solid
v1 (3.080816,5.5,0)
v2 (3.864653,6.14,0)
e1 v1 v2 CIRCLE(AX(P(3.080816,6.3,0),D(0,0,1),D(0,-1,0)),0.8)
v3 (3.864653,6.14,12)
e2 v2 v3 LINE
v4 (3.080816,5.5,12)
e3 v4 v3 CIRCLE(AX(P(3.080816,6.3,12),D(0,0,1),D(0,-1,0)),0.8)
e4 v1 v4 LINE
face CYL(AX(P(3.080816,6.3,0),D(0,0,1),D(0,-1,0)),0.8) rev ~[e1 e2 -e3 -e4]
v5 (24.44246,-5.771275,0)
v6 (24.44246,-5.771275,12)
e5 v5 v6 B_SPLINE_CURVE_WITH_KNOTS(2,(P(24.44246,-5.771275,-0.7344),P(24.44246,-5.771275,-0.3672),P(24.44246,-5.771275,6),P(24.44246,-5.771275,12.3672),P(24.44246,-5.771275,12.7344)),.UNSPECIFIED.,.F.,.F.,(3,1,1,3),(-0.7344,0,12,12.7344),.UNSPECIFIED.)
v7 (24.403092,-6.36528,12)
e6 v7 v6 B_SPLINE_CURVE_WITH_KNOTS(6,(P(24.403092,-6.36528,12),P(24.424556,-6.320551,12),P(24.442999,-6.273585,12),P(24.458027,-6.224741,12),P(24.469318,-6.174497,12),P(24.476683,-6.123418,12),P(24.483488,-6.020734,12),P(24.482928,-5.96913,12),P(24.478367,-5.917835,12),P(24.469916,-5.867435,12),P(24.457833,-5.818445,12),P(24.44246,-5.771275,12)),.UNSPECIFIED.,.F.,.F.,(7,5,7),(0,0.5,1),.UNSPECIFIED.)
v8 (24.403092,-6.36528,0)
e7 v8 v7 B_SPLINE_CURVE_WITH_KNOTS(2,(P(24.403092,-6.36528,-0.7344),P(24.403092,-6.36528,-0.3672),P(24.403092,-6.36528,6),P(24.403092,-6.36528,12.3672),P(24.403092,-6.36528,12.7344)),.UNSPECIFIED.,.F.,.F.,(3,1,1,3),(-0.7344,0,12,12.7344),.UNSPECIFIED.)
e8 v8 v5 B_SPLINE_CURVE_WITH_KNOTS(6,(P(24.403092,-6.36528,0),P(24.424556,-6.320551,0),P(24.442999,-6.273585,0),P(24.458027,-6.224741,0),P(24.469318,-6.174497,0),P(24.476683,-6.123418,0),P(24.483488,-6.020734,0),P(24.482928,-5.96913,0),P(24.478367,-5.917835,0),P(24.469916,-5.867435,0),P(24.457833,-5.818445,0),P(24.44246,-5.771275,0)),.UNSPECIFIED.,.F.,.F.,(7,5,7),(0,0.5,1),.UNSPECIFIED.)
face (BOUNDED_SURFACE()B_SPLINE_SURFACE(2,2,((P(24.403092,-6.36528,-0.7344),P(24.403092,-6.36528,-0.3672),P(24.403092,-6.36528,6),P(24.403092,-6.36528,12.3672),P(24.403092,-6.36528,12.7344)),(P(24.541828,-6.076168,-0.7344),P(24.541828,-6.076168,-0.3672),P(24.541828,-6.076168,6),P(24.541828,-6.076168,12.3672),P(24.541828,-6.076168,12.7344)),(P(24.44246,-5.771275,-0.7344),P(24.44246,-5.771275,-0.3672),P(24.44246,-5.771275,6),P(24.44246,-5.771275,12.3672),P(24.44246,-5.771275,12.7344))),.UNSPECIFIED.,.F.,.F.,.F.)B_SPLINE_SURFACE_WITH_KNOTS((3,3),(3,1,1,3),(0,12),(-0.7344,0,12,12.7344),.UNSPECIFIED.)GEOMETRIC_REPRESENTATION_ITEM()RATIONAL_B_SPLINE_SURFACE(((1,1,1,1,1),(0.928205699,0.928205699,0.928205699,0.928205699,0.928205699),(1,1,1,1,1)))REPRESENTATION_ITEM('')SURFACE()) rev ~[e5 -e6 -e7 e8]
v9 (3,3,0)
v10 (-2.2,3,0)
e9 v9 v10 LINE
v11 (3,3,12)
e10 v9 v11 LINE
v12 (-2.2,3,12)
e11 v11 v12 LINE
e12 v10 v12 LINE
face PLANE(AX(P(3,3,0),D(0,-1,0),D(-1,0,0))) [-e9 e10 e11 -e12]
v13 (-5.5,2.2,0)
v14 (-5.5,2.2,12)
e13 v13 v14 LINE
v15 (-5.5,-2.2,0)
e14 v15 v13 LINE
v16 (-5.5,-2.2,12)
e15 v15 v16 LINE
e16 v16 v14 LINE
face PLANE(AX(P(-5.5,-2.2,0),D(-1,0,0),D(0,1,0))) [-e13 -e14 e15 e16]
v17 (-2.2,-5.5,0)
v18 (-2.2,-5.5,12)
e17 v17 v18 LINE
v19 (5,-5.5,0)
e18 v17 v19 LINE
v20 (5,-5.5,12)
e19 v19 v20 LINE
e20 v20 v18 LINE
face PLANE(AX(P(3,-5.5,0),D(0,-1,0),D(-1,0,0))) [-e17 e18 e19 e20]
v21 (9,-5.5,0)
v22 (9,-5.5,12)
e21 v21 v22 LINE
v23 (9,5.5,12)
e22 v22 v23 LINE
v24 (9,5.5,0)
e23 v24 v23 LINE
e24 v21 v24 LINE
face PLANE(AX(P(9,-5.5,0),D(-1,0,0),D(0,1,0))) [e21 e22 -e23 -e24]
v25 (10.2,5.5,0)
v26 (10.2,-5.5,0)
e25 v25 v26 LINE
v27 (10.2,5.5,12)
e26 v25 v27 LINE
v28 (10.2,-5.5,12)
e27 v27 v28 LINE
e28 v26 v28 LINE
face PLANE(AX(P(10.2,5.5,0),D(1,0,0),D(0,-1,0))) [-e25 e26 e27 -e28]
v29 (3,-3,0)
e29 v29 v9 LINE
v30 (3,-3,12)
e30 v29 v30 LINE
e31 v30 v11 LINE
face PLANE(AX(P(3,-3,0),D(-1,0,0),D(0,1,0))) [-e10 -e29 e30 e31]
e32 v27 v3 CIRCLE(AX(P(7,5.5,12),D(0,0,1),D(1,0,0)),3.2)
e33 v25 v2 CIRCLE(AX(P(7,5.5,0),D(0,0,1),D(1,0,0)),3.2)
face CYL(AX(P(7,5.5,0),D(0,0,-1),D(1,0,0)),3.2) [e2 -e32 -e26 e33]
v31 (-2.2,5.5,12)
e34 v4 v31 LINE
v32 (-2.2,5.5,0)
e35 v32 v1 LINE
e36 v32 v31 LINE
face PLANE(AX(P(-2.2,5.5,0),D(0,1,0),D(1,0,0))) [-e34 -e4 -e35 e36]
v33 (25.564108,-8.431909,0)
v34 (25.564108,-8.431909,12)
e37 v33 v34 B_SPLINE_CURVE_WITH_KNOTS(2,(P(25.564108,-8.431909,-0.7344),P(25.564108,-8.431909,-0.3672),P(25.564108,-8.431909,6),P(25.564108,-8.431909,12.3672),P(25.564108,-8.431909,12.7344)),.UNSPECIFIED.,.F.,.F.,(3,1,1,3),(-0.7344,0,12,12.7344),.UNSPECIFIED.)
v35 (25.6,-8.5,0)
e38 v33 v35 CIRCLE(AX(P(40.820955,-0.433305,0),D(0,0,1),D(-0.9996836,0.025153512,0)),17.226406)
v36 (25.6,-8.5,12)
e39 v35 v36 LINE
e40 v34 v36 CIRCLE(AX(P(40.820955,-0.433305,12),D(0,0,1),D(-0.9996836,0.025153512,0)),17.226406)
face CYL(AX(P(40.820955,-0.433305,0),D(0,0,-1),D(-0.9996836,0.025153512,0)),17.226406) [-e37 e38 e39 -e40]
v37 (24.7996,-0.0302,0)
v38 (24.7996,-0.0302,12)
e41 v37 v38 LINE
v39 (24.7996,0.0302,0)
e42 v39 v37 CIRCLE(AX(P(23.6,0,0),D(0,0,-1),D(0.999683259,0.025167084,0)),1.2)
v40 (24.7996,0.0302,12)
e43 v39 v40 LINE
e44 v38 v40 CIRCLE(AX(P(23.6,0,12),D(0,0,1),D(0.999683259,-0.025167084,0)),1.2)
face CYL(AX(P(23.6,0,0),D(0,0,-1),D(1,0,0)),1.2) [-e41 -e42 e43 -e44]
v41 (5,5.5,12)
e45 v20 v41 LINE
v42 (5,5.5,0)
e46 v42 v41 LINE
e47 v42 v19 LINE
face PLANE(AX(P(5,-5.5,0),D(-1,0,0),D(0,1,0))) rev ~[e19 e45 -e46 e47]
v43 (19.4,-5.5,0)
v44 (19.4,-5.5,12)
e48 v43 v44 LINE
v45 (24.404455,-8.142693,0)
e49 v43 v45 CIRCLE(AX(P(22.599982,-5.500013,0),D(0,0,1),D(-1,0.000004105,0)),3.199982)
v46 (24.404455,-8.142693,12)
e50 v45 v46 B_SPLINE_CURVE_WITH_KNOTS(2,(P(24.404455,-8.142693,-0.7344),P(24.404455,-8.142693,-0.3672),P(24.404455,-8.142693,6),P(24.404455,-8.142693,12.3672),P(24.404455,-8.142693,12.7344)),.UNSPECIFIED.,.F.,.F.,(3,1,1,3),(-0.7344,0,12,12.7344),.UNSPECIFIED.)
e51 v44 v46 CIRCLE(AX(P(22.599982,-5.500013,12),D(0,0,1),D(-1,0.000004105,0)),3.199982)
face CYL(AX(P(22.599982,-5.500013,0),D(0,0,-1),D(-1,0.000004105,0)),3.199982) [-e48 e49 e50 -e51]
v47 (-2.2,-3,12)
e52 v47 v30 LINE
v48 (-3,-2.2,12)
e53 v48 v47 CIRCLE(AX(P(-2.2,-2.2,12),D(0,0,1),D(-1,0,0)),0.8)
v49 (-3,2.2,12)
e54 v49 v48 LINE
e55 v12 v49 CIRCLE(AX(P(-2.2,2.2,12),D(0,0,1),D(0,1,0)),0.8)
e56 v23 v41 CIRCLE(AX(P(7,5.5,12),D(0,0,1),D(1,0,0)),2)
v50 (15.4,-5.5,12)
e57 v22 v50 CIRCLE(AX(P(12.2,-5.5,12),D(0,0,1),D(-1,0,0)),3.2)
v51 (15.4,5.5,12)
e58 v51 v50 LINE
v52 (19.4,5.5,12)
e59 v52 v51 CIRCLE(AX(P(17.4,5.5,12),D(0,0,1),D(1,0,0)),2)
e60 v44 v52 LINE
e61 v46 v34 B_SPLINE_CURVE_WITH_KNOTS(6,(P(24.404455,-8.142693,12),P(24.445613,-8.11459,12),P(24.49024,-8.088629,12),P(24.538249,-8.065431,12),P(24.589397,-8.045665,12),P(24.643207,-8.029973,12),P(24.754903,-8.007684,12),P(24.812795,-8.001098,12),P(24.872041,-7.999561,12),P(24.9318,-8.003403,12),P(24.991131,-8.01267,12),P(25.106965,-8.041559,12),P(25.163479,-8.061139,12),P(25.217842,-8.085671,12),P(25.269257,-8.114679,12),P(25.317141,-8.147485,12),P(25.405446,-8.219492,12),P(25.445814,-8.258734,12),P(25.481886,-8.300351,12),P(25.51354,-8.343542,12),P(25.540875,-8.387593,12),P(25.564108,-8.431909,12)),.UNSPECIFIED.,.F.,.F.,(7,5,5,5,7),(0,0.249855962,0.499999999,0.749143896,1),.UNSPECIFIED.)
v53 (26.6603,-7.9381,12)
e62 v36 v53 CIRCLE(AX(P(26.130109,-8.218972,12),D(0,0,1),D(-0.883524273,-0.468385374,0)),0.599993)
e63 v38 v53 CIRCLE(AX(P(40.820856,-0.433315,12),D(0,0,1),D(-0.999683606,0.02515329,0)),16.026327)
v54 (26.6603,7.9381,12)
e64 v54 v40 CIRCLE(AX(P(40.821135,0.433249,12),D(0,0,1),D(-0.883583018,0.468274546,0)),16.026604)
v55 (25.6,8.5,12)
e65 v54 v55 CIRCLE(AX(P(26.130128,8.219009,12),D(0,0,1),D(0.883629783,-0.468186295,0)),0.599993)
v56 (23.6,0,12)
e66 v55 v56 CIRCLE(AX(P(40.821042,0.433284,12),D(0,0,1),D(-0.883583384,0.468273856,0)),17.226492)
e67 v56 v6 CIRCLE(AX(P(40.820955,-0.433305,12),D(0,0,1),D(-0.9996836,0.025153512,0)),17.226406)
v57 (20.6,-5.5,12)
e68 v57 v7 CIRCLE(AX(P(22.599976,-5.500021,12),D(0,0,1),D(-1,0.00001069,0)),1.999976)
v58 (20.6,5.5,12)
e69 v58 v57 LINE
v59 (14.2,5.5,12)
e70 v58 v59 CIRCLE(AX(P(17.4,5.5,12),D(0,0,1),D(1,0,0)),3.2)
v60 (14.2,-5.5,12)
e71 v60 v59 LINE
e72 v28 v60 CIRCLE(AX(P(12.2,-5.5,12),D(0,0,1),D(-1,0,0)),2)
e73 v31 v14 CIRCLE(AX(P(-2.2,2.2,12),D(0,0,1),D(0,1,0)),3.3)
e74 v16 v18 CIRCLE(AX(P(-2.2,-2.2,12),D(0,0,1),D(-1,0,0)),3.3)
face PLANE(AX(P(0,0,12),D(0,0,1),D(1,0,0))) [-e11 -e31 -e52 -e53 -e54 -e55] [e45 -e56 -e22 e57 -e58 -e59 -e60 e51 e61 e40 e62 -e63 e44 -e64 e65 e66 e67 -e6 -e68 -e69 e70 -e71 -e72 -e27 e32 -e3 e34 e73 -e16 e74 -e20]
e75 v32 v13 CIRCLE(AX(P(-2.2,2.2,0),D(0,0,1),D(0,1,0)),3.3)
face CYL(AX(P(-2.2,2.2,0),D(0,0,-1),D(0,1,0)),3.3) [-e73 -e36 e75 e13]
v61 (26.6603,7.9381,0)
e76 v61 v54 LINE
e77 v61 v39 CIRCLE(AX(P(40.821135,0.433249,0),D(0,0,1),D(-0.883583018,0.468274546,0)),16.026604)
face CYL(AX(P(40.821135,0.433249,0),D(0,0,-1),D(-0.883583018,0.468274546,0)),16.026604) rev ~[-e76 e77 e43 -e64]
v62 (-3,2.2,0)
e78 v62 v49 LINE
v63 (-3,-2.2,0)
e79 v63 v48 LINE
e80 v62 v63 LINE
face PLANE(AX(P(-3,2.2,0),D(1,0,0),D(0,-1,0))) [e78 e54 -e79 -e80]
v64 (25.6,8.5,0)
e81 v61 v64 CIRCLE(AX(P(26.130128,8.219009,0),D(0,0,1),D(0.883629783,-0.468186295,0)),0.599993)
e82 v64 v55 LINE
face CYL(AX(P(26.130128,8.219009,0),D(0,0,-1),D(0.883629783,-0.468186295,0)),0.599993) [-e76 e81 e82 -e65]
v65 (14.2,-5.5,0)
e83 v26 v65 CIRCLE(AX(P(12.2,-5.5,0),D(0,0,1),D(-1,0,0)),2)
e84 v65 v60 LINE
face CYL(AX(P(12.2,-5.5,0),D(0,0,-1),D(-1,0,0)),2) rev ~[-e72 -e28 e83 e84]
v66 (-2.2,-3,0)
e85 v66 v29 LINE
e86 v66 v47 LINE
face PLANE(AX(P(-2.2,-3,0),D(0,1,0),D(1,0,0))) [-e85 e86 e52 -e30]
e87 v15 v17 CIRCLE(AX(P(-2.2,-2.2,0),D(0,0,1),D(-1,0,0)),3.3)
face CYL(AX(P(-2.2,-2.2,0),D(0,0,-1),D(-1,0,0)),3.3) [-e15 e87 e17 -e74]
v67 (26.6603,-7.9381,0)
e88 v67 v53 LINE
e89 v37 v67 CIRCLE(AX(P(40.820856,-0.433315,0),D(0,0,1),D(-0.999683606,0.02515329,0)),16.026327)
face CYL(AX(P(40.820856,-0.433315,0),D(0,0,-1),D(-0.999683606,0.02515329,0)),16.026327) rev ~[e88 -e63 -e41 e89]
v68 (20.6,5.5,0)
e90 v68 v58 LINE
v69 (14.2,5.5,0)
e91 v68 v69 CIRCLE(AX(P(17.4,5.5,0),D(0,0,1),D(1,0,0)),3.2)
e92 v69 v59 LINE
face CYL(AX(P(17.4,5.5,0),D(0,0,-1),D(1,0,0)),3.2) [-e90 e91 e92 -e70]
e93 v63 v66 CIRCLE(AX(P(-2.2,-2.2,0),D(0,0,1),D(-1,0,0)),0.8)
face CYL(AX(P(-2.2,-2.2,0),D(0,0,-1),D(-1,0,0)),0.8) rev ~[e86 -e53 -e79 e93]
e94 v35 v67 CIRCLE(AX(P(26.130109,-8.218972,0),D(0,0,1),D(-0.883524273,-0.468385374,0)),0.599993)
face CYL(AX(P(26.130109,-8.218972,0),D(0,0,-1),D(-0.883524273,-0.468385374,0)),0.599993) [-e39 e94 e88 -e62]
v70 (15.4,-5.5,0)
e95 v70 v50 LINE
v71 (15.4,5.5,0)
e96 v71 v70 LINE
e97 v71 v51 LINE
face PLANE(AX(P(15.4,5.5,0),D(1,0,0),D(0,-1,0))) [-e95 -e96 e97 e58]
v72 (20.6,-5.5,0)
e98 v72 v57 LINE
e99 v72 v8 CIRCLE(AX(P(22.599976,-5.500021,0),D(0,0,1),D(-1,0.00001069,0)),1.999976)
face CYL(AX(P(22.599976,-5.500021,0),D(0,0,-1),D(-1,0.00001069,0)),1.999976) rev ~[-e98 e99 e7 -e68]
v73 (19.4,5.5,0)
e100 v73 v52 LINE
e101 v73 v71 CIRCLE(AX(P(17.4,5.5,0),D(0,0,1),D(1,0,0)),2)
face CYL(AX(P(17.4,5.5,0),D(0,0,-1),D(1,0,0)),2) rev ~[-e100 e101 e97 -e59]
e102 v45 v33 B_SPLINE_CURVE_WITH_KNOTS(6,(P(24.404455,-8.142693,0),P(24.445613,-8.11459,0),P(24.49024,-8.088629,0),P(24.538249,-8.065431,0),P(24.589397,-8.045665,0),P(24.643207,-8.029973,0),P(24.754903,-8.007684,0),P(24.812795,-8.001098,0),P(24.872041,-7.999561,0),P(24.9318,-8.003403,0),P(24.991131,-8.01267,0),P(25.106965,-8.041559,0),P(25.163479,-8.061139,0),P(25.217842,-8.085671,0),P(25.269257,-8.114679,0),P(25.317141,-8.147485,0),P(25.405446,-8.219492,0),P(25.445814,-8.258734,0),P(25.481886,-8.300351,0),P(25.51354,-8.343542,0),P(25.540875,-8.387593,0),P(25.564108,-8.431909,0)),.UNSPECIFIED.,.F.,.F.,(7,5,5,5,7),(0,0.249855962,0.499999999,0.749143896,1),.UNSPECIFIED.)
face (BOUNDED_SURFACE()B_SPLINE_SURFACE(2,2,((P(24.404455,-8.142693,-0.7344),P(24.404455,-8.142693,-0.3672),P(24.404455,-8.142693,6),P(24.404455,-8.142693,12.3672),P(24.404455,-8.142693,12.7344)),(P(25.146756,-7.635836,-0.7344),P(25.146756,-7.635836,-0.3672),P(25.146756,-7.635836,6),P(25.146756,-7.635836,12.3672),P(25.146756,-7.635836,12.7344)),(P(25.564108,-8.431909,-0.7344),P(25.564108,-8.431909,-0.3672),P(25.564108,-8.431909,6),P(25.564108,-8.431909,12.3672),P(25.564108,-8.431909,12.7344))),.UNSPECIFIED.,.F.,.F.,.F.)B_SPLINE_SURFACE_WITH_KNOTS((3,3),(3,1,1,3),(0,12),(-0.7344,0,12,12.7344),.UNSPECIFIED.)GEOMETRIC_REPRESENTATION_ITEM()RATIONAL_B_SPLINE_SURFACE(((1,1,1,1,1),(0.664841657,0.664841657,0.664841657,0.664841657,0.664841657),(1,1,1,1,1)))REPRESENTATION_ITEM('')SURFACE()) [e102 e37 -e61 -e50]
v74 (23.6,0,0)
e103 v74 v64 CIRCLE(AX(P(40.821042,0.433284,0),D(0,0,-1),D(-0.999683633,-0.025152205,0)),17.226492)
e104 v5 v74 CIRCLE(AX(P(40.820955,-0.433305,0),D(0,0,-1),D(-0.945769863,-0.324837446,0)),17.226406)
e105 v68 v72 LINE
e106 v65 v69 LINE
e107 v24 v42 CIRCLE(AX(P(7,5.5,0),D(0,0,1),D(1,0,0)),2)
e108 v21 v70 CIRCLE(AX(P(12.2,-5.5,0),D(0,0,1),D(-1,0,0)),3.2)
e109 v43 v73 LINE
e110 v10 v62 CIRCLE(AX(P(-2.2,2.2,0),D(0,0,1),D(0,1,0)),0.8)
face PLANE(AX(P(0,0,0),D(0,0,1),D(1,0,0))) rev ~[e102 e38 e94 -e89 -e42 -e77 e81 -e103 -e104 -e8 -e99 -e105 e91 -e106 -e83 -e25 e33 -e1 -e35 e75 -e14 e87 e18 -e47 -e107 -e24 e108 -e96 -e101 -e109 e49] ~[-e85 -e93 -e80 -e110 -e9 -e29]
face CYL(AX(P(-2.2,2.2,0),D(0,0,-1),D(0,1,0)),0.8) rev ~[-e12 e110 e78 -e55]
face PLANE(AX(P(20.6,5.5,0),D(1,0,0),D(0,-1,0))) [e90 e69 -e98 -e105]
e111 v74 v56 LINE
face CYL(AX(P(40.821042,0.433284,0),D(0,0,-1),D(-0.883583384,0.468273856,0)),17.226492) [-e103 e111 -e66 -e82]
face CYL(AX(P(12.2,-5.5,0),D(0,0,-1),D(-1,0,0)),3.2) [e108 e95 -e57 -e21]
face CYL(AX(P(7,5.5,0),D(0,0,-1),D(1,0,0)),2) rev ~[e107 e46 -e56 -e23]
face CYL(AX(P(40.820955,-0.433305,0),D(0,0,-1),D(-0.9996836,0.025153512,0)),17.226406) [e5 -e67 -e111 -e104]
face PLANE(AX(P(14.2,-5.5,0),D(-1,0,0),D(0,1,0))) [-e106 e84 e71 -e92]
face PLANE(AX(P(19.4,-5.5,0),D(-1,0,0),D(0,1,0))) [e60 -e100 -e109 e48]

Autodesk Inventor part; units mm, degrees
ref_plane "YZ Plane" through (0, 0, 0) normal (1, 0, 0) x (0, 1, 0)
ref_plane "XZ Plane" through (0, 0, 0) normal (0, 1, 0) x (-1, 0, 0)
ref_plane "XY Plane" through (0, 0, 0) normal (0, 0, 1) x (1, 0, 0)
sketch "Boceto1" plane through (0, 0, 0) normal (0, 0, 1) x (1, 0, 0)
  line L0 (3, -11.4) -> (3, -5.5)
  line L1 (3, -5.5) -> (-2.2, -5.5)
  arc A0 (-5.5, -2.2) -> (-2.2, -5.5) centre (-2.2, -2.2) ccw
  line L2 (-5.5, -2.2) -> (-5.5, 2.2)
  arc A1 (-2.2, 5.5) -> (-5.5, 2.2) centre (-2.2, 2.2) ccw
  line L3 (-2.2, 5.5) -> (3, 5.5)
  line L4 (3, 5.5) -> (3, 11.4)
  line L5 (3, 3) -> (-2.2, 3)
  arc A2 (-2.2, 3) -> (-3, 2.2) centre (-2.2, 2.2) ccw
  line L6 (-3, 2.2) -> (-3, -2.2)
  arc A3 (-3, -2.2) -> (-2.2, -3) centre (-2.2, -2.2) ccw
  line L7 (-2.2, -3) -> (3, -3)
  line L8 (3, -3) -> (3, 3)
  line L9 (-2.2, 3.25) -> (3.25, 3.25)
  line L10 (3.25, 3.25) -> (3.25, -3.25)
  line L11 (3.25, -3.25) -> (-2.2, -3.25)
  arc A4 (-3.25, -2.2) -> (-2.2, -3.25) centre (-2.2, -2.2) ccw
  line L12 (-3.25, -2.2) -> (-3.25, 2.2)
  arc A5 (-2.2, 3.25) -> (-3.25, 2.2) centre (-2.2, 2.2) ccw
  line L13 (-2.2, 5) -> (5, 5)
  line L14 (5, 5) -> (5, -5)
  line L15 (5, -5) -> (-2.2, -5)
  arc A6 (-5, -2.2) -> (-2.2, -5) centre (-2.2, -2.2) ccw
  line L16 (-5, -2.2) -> (-5, 2.2)
  arc A7 (-2.2, 5) -> (-5, 2.2) centre (-2.2, 2.2) ccw
  line L17 (23.6, 0) -> (22.4, 0)
  arc A8 (25.6, 8.5) -> (23.6, 0) centre (40.821, 0.4333) ccw
  circle A9 centre (23.6, 0) radius 1.2
  arc A10 (26.6603, 7.9381) -> (24.7996, 0.0302) centre (40.821, 0.4333) ccw
  line L18 (25.6, 8.5) -> (25.9736, 8.302)
  arc A11 (26.6603, 7.9381) -> (25.6, 8.5) centre (26.1301, 8.219) ccw
  arc A12 (23.6, 0) -> (25.6, -8.5) centre (40.821, -0.4333) ccw
  arc A13 (24.7996, -0.0302) -> (26.6603, -7.9381) centre (40.821, -0.4333) ccw
  line L19 (25.9736, -8.302) -> (26.6603, -7.9381)
  arc A14 (25.6, -8.5) -> (26.6603, -7.9381) centre (26.1301, -8.219) ccw
  line L20 (3, -5.5) -> (5, -5.5)
  line L21 (5, -5.5) -> (5, -5)
  line L22 (3, 5.5) -> (5, 5.5)
  line L23 (5, 5) -> (5, 5.5)
  line L24 (5, 5.5) -> (7, 5.5)
  line L25 (9, 5.5) -> (10.2, 5.5)
  line L26 (10.2, 5.5) -> (10.2, -5.5)
  line L27 (10.2, -5.5) -> (9, -5.5)
  line L28 (9, -5.5) -> (9, 5.5)
  line L29 (10.2, -5.5) -> (12.2, -5.5)
  arc A15 (10.2, 5.5) -> (3.8, 5.5) centre (7, 5.5) ccw
  arc A16 (9, 5.5) -> (5, 5.5) centre (7, 5.5) ccw
  line L30 (15.4, -5.5) -> (14.2, -5.5)
  line L31 (14.2, -5.5) -> (14.2, 5.5)
  line L32 (14.2, 5.5) -> (15.4, 5.5)
  line L33 (15.4, 5.5) -> (15.4, -5.5)
  arc A17 (10.2, -5.5) -> (14.2, -5.5) centre (12.2, -5.5) ccw
  arc A18 (9, -5.5) -> (15.4, -5.5) centre (12.2, -5.5) ccw
  line L34 (19.4, 5.5) -> (20.6, 5.5)
  line L35 (20.6, 5.5) -> (20.6, -5.5)
  line L36 (20.6, -5.5) -> (19.4, -5.5)
  line L37 (19.4, -5.5) -> (19.4, 5.5)
  line L38 (20.6, -5.5) -> (22.6, -5.5)
  arc A19 (20.6, 5.5) -> (14.2, 5.5) centre (17.4, 5.5) ccw
  arc A20 (19.4, 5.5) -> (15.4, 5.5) centre (17.4, 5.5) ccw
  arc A21 (20.6, -5.5) -> (24.5287, -6.0291) centre (22.6, -5.5) ccw
  arc A22 (19.4, -5.5) -> (25.1061, -7.4898) centre (22.6, -5.5) ccw
  point P0 (0, 0)
  point P1 (4.2, -5)
  point P2 (3.8, 5)
  point P3 (23, 0)
  point P4 (23.6116, -1.1999)
  point P5 (24.7996, 0.0302)
  point P6 (23.6116, 1.1999)
  dimension "d1" = 0.25
  dimension "d2" = 2
  dimension "d41" = 1.2
  dimension "d44" = 2
  dimension "d46" = 11
  dimension "d47" = 2
  dimension "d48" = 1.2
  dimension "d49" = 11
  dimension "d50" = 11
  dimension "d51" = 2
extrude "Extrusión1" add sketch "Boceto1" along normal blind 12 contours L1 A0 L2 A1 L3 L22 L23 L13 A7 L16 A6 L15 L21 L20 | L15 A6 L16 A7 L13 L14 | L22 A15 L25 A16 | L25 L26 L27 L28 | L27 A17 L30 A18 | L30 L31 L32 L33 | L32 A19 L34 A20 | L34 L35 L36 L37 | L36 A21 A12 A22 | A12 A9 A13 A14 | A12 A8 A9 | A8 A11 A10 A9 | L9 L10 L11 A4 L12 A5
fillet "Empalme1" radius 0.8 3 edges at (3.8, 5.5, 6) (25.1061, -7.4898, 6) (24.5287, -6.0291, 6)
properties part number "_3DPrint"
